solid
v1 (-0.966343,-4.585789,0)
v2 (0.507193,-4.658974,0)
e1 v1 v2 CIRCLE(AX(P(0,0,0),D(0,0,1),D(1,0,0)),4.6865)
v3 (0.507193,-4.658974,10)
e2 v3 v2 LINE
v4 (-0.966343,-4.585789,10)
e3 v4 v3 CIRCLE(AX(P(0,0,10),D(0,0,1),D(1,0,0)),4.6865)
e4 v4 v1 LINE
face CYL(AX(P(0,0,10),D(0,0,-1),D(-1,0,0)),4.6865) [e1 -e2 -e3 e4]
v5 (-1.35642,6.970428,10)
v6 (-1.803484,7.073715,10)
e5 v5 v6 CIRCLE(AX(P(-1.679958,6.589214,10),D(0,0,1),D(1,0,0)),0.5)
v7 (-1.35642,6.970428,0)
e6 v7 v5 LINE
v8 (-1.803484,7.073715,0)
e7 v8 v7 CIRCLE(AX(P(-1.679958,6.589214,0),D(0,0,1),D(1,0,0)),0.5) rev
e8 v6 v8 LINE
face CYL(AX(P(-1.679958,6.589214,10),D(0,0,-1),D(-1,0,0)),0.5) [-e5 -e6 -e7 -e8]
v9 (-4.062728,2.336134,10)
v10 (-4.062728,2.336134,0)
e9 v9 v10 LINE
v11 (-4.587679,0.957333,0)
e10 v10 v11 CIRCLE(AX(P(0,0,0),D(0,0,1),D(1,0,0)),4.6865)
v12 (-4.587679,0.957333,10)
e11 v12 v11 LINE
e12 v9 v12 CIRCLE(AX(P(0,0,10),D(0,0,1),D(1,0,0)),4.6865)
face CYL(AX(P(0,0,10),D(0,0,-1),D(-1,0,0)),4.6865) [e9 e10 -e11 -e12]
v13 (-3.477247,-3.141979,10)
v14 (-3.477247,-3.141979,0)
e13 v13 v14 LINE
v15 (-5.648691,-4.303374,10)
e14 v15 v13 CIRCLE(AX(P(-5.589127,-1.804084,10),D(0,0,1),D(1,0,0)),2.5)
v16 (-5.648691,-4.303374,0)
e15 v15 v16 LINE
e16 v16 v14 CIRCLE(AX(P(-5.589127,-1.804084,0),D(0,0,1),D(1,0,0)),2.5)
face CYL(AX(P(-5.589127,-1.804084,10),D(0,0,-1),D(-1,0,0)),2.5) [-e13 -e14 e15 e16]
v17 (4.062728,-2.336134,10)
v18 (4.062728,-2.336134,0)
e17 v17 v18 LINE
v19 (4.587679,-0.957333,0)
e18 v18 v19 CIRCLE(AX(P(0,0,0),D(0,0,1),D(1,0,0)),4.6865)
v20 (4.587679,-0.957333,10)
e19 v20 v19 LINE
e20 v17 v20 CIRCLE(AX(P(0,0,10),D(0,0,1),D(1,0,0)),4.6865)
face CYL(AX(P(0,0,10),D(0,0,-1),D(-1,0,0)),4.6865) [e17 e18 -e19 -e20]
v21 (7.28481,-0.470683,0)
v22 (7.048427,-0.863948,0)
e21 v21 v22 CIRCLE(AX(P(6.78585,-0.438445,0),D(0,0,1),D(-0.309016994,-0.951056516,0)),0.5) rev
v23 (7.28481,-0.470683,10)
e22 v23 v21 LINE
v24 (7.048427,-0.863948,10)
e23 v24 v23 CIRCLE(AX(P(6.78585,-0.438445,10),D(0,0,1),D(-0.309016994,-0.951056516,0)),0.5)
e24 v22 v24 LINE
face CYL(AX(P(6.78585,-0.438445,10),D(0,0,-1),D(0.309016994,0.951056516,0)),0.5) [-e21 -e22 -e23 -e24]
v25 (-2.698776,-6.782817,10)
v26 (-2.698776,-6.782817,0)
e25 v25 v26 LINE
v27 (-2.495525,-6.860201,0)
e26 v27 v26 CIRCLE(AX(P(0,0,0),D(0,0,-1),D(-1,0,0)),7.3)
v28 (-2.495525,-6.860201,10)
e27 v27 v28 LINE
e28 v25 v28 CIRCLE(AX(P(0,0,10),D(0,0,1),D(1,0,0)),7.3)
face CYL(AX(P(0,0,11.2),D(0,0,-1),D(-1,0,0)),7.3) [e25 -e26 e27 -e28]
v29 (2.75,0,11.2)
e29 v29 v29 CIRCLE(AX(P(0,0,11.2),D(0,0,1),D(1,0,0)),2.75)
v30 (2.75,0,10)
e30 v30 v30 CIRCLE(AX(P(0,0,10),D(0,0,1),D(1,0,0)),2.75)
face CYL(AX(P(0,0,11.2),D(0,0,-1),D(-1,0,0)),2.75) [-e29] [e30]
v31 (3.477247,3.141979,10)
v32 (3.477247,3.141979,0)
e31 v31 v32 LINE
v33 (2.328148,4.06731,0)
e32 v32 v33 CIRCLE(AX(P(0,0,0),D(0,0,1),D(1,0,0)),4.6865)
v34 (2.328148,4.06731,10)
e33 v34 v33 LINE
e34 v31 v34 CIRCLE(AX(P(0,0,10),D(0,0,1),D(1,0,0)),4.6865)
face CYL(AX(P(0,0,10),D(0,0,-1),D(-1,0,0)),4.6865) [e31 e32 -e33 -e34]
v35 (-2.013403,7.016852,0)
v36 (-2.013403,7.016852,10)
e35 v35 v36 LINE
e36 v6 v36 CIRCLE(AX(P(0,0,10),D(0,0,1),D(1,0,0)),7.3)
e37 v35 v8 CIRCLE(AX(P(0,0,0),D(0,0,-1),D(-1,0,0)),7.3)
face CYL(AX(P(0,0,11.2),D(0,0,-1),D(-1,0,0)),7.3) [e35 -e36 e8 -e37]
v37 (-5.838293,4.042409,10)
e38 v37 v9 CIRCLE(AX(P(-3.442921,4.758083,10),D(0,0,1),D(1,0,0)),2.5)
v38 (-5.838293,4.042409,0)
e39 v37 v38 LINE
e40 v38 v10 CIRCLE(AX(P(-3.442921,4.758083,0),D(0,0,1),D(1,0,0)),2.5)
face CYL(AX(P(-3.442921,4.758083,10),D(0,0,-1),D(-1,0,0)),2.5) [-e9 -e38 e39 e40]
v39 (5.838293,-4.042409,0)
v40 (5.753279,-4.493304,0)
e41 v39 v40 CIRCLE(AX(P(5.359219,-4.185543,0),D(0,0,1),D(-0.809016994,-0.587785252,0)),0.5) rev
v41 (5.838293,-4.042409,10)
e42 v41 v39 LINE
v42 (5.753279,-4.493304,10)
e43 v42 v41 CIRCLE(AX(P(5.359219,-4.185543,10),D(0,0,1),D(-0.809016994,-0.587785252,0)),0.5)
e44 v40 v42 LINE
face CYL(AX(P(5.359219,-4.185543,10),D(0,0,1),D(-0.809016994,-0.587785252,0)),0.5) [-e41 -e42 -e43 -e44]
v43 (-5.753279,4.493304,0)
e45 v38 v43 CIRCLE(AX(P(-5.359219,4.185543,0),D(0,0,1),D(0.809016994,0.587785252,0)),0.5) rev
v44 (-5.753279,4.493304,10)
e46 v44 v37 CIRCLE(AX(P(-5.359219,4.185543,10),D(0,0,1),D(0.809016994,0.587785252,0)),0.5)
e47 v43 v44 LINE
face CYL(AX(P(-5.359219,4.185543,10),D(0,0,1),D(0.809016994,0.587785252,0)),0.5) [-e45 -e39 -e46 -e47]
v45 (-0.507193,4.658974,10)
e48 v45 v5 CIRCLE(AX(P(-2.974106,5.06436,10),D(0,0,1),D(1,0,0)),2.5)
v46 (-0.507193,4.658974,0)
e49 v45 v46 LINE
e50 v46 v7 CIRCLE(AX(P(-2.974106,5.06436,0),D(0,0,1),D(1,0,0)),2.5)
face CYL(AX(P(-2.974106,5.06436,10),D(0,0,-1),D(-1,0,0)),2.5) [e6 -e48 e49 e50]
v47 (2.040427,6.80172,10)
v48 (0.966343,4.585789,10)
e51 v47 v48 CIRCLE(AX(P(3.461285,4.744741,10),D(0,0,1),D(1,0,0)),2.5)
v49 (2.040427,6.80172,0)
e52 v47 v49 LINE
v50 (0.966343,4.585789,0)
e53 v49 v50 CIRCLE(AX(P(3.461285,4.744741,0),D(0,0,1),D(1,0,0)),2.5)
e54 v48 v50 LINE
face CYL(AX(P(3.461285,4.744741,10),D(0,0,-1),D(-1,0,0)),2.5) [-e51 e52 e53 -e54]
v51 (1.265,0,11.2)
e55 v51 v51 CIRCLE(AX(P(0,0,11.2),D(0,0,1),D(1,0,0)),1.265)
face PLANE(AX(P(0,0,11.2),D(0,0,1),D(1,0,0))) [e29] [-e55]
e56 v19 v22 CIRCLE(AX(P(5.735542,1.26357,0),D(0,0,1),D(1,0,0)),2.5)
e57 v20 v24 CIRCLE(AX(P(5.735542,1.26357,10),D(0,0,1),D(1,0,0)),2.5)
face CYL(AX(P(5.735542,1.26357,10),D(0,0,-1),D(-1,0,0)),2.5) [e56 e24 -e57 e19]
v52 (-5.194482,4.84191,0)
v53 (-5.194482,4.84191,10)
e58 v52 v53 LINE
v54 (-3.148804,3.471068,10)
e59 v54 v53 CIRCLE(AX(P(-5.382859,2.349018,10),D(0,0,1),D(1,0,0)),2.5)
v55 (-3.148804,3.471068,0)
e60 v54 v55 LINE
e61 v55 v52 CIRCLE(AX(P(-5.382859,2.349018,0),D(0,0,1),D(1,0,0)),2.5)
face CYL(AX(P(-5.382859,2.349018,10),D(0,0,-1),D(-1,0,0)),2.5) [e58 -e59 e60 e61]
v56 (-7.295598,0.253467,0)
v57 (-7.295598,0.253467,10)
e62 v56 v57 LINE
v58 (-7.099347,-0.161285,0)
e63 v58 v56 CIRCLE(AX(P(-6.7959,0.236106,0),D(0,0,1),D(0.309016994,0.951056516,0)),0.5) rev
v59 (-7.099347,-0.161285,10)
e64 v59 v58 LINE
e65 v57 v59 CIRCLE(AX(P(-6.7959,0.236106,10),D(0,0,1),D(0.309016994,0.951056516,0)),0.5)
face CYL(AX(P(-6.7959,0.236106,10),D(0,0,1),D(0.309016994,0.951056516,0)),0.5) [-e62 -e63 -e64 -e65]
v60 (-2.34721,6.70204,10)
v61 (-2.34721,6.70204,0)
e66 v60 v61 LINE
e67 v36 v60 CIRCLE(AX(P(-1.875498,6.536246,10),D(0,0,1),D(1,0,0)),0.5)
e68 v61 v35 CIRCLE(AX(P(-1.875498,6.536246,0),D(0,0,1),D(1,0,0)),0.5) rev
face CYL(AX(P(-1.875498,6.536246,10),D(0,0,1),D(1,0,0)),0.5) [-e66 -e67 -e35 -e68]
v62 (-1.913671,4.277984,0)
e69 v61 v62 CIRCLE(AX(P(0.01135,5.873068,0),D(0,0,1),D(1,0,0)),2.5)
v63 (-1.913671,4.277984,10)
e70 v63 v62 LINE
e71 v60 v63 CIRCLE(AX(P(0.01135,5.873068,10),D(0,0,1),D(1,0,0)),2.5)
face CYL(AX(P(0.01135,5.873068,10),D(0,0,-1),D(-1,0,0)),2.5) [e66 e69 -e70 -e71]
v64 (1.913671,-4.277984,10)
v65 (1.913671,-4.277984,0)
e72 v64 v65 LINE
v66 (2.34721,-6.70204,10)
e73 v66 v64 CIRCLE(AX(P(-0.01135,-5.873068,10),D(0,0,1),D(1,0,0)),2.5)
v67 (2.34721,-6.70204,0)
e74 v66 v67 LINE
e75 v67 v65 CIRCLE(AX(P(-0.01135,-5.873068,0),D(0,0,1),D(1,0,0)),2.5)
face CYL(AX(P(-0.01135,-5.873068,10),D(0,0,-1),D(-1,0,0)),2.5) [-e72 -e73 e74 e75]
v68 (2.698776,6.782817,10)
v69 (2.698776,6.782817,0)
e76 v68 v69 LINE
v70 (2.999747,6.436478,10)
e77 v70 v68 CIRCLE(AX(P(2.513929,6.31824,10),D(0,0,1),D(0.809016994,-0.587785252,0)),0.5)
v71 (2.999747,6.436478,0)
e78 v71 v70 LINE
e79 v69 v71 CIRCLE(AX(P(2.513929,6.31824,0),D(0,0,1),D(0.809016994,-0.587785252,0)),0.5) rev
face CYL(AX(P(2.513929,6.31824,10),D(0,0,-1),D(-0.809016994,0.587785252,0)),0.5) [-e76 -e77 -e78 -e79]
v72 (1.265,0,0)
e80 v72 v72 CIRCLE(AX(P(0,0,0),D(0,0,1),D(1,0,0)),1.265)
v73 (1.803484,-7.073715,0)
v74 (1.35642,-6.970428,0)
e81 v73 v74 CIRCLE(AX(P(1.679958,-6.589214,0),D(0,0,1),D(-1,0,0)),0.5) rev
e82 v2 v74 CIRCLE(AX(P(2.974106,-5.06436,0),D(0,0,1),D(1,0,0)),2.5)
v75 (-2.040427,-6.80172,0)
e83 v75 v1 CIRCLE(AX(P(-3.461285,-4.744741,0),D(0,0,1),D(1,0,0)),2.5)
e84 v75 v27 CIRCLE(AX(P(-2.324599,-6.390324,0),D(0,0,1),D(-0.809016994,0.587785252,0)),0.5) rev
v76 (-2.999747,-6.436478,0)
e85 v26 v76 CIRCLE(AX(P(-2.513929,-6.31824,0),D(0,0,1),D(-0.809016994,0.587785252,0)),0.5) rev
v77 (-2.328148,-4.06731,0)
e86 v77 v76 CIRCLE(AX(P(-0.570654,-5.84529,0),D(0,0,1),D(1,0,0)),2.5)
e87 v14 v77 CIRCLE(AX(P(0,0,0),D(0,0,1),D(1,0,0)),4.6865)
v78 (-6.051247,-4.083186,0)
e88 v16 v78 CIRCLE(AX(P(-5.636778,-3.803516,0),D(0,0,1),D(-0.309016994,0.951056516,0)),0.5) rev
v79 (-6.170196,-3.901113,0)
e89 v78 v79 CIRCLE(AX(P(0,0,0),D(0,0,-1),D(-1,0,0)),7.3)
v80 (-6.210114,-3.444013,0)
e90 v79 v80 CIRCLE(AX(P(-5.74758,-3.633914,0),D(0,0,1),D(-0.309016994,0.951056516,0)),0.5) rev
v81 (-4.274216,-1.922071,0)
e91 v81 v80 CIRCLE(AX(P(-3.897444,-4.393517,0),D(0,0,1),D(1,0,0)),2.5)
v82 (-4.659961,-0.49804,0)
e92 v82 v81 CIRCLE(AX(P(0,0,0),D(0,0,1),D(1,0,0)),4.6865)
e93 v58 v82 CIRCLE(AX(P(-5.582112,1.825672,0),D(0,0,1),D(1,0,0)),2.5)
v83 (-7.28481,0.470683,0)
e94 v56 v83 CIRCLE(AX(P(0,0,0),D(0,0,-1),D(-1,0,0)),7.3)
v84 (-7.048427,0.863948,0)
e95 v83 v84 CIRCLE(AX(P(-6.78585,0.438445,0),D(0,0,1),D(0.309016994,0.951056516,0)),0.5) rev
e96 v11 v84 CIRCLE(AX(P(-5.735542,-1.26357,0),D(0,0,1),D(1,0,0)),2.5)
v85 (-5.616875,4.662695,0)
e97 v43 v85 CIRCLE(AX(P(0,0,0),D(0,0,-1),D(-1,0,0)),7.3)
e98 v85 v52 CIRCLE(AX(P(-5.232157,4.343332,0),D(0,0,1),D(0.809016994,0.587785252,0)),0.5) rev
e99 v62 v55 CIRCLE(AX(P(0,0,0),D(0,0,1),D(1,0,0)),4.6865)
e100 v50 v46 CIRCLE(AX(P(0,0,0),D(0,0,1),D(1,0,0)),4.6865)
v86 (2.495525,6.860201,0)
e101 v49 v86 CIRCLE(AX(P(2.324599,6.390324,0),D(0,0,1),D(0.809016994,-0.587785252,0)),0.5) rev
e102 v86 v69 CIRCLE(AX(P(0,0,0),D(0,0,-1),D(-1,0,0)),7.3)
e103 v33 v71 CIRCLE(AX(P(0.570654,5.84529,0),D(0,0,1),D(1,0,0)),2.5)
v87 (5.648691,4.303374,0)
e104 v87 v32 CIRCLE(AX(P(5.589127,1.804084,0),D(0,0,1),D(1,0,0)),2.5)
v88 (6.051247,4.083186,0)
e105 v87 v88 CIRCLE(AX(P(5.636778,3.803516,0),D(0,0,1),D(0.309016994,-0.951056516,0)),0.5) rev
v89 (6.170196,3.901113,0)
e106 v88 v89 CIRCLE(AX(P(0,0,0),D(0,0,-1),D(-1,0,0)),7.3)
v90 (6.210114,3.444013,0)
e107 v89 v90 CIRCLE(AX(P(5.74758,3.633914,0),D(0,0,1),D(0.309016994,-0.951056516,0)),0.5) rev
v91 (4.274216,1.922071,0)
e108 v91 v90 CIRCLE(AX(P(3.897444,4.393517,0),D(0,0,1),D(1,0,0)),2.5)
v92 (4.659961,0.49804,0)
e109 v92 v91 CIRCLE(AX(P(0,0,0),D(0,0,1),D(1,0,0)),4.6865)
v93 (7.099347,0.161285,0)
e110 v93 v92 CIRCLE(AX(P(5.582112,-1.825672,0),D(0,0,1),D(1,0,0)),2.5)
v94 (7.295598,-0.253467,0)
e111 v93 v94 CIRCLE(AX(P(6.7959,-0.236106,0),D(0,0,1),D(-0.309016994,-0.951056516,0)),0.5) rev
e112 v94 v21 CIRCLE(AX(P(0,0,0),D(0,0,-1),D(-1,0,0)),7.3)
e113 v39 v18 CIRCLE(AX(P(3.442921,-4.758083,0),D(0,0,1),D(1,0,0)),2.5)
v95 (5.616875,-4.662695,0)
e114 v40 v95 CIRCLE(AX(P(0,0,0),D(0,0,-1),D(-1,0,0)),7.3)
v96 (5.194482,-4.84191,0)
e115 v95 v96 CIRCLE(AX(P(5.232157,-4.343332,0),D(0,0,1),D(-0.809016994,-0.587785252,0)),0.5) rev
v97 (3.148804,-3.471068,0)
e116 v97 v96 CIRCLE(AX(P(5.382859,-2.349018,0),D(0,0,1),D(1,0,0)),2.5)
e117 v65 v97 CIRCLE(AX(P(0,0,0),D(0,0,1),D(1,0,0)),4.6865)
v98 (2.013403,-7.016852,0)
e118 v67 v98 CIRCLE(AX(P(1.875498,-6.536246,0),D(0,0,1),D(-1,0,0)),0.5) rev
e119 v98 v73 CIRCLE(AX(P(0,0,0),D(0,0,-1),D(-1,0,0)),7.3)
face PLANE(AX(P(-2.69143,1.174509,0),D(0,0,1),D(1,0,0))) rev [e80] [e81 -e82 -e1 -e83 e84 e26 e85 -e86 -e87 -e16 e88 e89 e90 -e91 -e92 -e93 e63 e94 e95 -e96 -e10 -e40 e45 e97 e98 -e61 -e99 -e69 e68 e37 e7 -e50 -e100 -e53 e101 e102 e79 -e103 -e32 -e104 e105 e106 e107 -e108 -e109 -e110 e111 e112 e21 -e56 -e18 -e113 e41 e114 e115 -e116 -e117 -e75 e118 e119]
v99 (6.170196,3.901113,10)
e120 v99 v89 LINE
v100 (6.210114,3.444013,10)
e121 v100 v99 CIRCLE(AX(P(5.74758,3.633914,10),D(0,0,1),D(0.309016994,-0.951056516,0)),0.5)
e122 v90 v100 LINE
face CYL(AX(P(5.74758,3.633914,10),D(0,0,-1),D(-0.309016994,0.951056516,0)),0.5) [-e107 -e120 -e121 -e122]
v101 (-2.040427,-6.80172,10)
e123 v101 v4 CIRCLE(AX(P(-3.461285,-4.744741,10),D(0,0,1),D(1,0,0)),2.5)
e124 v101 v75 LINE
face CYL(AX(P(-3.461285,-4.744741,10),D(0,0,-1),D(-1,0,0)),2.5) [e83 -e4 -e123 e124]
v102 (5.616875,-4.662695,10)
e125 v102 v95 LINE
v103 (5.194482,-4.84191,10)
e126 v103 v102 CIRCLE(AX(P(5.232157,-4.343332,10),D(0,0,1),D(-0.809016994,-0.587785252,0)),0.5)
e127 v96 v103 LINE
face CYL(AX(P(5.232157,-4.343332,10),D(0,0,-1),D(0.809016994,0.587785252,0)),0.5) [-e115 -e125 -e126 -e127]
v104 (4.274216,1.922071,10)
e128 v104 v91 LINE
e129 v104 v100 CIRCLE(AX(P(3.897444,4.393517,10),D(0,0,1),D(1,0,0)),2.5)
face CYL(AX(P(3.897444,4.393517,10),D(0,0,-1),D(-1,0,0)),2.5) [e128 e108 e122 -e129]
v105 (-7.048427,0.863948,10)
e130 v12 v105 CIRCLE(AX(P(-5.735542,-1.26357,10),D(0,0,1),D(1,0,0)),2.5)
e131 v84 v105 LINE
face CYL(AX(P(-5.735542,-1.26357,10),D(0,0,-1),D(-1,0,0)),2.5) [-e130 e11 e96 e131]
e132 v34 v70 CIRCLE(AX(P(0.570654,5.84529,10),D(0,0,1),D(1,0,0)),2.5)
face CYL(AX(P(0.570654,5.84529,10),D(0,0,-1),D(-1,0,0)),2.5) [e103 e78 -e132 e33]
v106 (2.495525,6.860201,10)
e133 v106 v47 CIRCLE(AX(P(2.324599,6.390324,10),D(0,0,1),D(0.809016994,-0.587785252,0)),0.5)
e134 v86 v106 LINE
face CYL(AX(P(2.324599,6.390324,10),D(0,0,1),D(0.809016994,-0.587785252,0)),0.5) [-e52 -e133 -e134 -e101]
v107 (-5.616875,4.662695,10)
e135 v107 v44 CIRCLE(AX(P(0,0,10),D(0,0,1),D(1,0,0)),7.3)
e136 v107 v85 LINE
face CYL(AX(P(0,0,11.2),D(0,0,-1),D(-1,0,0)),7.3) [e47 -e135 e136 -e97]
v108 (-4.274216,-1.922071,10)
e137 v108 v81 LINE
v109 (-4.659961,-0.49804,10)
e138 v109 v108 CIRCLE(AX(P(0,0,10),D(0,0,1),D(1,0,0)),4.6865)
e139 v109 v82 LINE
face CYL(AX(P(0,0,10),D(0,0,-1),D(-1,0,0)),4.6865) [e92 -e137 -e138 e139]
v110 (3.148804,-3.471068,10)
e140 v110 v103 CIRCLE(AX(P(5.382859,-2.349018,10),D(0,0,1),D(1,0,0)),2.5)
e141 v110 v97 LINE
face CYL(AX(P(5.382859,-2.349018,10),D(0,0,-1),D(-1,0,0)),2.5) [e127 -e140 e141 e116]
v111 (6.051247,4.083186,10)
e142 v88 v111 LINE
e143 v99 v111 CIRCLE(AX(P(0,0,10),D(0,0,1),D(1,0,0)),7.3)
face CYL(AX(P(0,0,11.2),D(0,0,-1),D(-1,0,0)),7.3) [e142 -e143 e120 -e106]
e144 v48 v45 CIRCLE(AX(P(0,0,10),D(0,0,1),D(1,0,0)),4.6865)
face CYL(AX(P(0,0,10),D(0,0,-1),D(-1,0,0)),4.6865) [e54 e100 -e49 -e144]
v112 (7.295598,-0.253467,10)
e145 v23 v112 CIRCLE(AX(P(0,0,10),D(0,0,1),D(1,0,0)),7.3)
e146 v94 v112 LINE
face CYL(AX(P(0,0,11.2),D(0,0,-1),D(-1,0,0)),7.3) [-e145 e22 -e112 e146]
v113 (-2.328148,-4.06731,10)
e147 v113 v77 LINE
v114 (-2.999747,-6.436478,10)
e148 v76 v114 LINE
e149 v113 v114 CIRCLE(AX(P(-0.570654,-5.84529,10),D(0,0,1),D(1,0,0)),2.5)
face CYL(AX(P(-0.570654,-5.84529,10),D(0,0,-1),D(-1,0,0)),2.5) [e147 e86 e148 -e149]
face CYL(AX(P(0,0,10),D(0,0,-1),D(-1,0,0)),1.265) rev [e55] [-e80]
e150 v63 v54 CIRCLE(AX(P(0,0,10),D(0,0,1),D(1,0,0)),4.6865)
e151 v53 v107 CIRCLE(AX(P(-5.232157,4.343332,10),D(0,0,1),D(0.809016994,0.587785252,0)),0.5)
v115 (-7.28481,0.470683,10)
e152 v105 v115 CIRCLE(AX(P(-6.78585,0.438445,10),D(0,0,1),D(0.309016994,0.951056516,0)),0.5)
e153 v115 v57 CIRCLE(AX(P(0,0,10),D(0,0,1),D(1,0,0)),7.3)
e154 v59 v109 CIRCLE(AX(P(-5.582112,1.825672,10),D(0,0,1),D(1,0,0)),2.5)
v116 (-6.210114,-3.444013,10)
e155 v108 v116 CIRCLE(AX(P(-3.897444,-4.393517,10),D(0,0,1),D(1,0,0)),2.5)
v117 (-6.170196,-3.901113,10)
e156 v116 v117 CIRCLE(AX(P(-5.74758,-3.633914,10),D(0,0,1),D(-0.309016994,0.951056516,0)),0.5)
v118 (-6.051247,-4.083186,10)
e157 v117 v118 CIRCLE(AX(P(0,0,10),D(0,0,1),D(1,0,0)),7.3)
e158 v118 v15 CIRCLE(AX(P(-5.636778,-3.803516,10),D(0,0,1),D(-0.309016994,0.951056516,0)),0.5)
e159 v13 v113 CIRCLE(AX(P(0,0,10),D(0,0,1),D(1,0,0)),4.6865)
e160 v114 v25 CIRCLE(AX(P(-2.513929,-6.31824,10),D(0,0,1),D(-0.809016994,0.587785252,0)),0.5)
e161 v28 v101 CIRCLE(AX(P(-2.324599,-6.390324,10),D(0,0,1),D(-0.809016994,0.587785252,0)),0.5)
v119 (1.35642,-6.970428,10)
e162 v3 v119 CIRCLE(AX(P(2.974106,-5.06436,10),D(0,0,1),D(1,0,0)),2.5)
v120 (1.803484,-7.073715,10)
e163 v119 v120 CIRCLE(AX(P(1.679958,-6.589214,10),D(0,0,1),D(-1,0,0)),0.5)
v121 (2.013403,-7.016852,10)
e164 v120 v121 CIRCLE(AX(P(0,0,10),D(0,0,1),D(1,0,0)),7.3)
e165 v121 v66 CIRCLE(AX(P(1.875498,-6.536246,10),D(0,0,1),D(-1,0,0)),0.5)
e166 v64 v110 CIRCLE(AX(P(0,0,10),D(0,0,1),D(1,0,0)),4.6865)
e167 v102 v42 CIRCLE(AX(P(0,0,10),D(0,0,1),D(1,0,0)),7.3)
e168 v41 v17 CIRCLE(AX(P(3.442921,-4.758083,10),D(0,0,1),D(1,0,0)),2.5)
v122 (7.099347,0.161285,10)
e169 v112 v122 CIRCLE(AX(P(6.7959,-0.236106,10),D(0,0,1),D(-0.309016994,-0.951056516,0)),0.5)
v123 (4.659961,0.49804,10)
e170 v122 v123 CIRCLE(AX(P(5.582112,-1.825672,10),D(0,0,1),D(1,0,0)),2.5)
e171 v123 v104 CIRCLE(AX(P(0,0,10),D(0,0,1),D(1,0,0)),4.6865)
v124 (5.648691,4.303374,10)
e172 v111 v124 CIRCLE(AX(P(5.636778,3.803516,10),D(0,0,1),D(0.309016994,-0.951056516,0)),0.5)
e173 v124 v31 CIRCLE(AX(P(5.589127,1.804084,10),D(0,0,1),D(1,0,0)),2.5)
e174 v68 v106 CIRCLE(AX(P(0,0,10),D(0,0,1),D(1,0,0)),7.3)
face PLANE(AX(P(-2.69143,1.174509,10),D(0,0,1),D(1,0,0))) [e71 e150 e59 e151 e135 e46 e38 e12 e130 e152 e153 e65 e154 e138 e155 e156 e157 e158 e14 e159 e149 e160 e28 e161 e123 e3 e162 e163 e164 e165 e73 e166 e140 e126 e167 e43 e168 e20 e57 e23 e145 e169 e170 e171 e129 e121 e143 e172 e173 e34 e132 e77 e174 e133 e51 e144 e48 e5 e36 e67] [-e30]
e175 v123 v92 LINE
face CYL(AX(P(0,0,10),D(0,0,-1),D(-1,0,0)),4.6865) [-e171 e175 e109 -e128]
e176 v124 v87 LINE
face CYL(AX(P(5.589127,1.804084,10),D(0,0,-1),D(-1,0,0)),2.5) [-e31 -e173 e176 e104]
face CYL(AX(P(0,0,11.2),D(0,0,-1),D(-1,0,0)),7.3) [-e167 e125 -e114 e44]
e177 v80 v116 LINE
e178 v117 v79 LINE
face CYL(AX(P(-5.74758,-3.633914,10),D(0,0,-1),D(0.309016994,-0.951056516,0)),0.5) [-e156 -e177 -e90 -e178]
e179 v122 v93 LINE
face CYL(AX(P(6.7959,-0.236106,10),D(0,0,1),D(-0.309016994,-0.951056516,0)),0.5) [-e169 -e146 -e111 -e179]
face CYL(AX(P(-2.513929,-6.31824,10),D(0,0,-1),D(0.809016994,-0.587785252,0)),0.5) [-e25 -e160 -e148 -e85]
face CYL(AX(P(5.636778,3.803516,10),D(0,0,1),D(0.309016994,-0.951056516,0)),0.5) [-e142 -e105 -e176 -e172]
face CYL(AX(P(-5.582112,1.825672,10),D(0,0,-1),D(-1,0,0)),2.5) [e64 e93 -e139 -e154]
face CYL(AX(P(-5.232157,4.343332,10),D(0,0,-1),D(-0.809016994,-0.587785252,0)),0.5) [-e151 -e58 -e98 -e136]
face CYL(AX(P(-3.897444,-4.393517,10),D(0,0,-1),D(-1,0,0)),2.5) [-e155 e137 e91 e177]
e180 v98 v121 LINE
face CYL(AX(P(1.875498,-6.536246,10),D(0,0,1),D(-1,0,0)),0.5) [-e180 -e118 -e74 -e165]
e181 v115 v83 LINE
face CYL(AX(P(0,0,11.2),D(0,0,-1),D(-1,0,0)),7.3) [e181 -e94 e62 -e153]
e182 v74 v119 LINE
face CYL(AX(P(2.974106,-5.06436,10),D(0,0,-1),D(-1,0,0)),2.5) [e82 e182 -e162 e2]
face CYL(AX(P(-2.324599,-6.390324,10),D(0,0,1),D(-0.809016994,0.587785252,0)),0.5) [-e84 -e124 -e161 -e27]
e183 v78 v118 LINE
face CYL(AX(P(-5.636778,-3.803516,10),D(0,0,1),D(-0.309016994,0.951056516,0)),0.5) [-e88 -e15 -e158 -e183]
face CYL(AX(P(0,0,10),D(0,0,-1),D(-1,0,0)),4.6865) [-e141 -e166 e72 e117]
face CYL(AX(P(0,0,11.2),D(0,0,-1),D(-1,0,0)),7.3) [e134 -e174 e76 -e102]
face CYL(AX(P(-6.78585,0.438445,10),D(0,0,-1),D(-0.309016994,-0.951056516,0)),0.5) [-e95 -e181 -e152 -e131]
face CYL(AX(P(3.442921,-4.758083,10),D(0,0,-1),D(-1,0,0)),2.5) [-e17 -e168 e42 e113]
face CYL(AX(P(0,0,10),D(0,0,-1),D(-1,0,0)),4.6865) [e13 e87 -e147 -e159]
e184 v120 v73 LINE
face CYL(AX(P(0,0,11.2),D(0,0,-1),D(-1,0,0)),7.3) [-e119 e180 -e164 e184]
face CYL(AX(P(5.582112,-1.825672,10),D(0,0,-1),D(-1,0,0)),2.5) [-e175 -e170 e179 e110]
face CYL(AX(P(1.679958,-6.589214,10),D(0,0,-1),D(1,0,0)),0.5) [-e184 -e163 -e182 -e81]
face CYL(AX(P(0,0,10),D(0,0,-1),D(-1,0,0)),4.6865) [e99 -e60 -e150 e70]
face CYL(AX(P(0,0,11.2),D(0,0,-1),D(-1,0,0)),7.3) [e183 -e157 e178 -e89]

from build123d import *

# Parameters (mm, degrees)
SKETCH_1_R               = 1.265
EXTRUDE_1_DEPTH          = 10
SKETCH_2_R               = 2.75
SKETCH_2_R_2             = 1.265
EXTRUDE_2_DEPTH          = 1.2
SKETCH_3_R               = 10.210079725
SKETCH_3_R_2             = 7.3
CUT_EXTRUDE_2_DEPTH      = 16.316956182
FILLET_1_R               = 0.5
PATTERN_CIRCULAR_2_DEPTH = 10


# Read off the part's stored shape, not the designer's step: Круговой массив2
with BuildPart() as part:
    # Эскиз1 → Бобышка-Вытянуть1 (new body)
    with BuildSketch(Plane.XY):
        with BuildLine():
            ThreePointArc((-3.148803906, 3.471068454), (-4.227852242, 4.566214035), (-5.743712894, 4.822837566))
            ThreePointArc((-5.743712894, 4.822837566), (-5.841480421, 4.703945843), (-5.936787387, 4.583072716))
            ThreePointArc((-5.936787387, 4.583072716), (-5.362797198, 3.156810321), (-4.062728379, 2.336133637))
            ThreePointArc((-4.062728379, 2.336133637), (-4.379801209, 1.667520202), (-4.587678719, 0.95733287))
            ThreePointArc((-4.587678719, 0.95733287), (-6.104357582, 1.209075557), (-7.481554138, 0.525687819))
            ThreePointArc((-7.481554138, 0.525687819), (-7.490766927, 0.372036085), (-7.496824441, 0.218227641))
            ThreePointArc((-7.496824441, 0.218227641), (-6.194120622, -0.598259906), (-4.659961201, -0.498040012))
            ThreePointArc((-4.659961201, -0.498040012), (-4.523477392, -1.225330377), (-4.274216191, -1.922071332))
            ThreePointArc((-4.274216191, -1.922071332), (-5.649205805, -2.609888688), (-6.361695989, -3.972256807))
            ThreePointArc((-6.361695989, -3.972256807), (-6.278835069, -4.101978813), (-6.193329365, -4.229972975))
            ThreePointArc((-6.193329365, -4.229972975), (-4.659500498, -4.124815183), (-3.477247231, -3.141979304))
            ThreePointArc((-3.477247231, -3.141979304), (-2.939338959, -3.650146399), (-2.328148353, -4.067309614))
            ThreePointArc((-2.328148353, -4.067309614), (-3.03624942, -5.431964161), (-2.811886199, -6.952934345))
            ThreePointArc((-2.811886199, -6.952934345), (-2.668601624, -7.009177225), (-2.524192976, -7.062467686))
            ThreePointArc((-2.524192976, -7.062467686), (-1.345109555, -6.075831258), (-0.966343005, -4.585789294))
            ThreePointArc((-0.966343005, -4.585789294), (-0.232472948, -4.68073056), (0.507193024, -4.658973866))
            ThreePointArc((0.507193024, -4.658973866), (0.736451045, -6.179213951), (1.811968547, -7.277827285))
            ThreePointArc((1.811968547, -7.277827285), (1.960946938, -7.239108171), (2.109099336, -7.197339786))
            ThreePointArc((2.109099336, -7.197339786), (2.483067519, -5.706086302), (1.913671403, -4.277983638))
            ThreePointArc((1.913671403, -4.277983638), (2.563189827, -3.92343474), (3.148803906, -3.471068454))
            ThreePointArc((3.148803906, -3.471068454), (4.227852242, -4.566214035), (5.743712894, -4.822837566))
            ThreePointArc((5.743712894, -4.822837566), (5.841480421, -4.703945843), (5.936787387, -4.583072716))
            ThreePointArc((5.936787387, -4.583072716), (5.362797198, -3.156810321), (4.062728379, -2.336133637))
            ThreePointArc((4.062728379, -2.336133637), (4.379801209, -1.667520202), (4.587678719, -0.95733287))
            ThreePointArc((4.587678719, -0.95733287), (6.104357582, -1.209075557), (7.481554138, -0.525687819))
            ThreePointArc((7.481554138, -0.525687819), (7.490766927, -0.372036085), (7.496824441, -0.218227641))
            ThreePointArc((7.496824441, -0.218227641), (6.194120622, 0.598259906), (4.659961201, 0.498040012))
            ThreePointArc((4.659961201, 0.498040012), (4.523477392, 1.225330377), (4.274216191, 1.922071332))
            ThreePointArc((4.274216191, 1.922071332), (5.649205805, 2.609888688), (6.361695989, 3.972256807))
            ThreePointArc((6.361695989, 3.972256807), (6.278835069, 4.101978813), (6.193329365, 4.229972975))
            ThreePointArc((6.193329365, 4.229972975), (4.659500498, 4.124815183), (3.477247231, 3.141979304))
            ThreePointArc((3.477247231, 3.141979304), (2.939338959, 3.650146399), (2.328148353, 4.067309614))
            ThreePointArc((2.328148353, 4.067309614), (3.03624942, 5.431964161), (2.811886199, 6.952934345))
            ThreePointArc((2.811886199, 6.952934345), (2.668601624, 7.009177225), (2.524192976, 7.062467686))
            ThreePointArc((2.524192976, 7.062467686), (1.345109555, 6.075831258), (0.966343005, 4.585789294))
            ThreePointArc((0.966343005, 4.585789294), (0.232472948, 4.68073056), (-0.507193024, 4.658973866))
            ThreePointArc((-0.507193024, 4.658973866), (-0.736451045, 6.179213951), (-1.811968547, 7.277827285))
            ThreePointArc((-1.811968547, 7.277827285), (-1.960946938, 7.239108171), (-2.109099336, 7.197339786))
            ThreePointArc((-2.109099336, 7.197339786), (-2.483067519, 5.706086302), (-1.913671403, 4.277983638))
            ThreePointArc((-1.913671403, 4.277983638), (-2.563189827, 3.92343474), (-3.148803906, 3.471068454))
        make_face()
        Circle(SKETCH_1_R, mode=Mode.SUBTRACT)
    extrude(amount=EXTRUDE_1_DEPTH)

    # Эскиз2 → Бобышка-Вытянуть2 (add)
    with BuildSketch(Plane.XY.offset(10)):
        Circle(SKETCH_2_R)
        Circle(SKETCH_2_R_2, mode=Mode.SUBTRACT)
    extrude(amount=EXTRUDE_2_DEPTH)

    # Эскиз3 → Вырез-Вытянуть2 (cut, through all)
    with BuildSketch(Plane(origin=(0, 0, 0), x_dir=(-1, 0, 0), z_dir=(0, 0, -1))):
        Circle(SKETCH_3_R)
        Circle(SKETCH_3_R_2, mode=Mode.SUBTRACT)
    extrude(amount=-CUT_EXTRUDE_2_DEPTH, mode=Mode.SUBTRACT)

    # Скругление1
    fillet_1_edges = [part.edges().sort_by_distance(p)[0] for p in [
        (-2.246892365, 6.945608303, 5),
        (-1.565958675, 7.13006125, 5),
    ]]
    fillet(fillet_1_edges, radius=FILLET_1_R)

    # Круговой массив2 outline → Круговой массив2 (cut)
    with BuildSketch(Plane.XY):
        with BuildLine():
            ThreePointArc((-5.838293306, 4.042408612), (-5.850561559, 4.278183981), (-5.753278974, 4.493304024))
            ThreePointArc((-5.753278974, 4.493304024), (-5.827604273, 4.396479095), (-5.900300237, 4.298424958))
            ThreePointArc((-5.900300237, 4.298424958), (-5.872671085, 4.169599529), (-5.838293306, 4.042408612))
        make_face()
        with BuildLine():
            ThreePointArc((-5.457832031, 4.847893307), (-5.538127486, 4.755958783), (-5.61687454, 4.662694543))
            ThreePointArc((-5.61687454, 4.662694543), (-5.427449488, 4.803615386), (-5.19448163, 4.841910441))
            ThreePointArc((-5.19448163, 4.841910441), (-5.326077976, 4.84837285), (-5.457832031, 4.847893307))
        make_face()
        with BuildLine():
            ThreePointArc((-7.099346669, -0.161285439), (-7.247857179, 0.022249743), (-7.295598302, 0.253466783))
            ThreePointArc((-7.295598302, 0.253466783), (-7.298816468, 0.131446456), (-7.299993962, 0.009389377))
            ThreePointArc((-7.299993962, 0.009389377), (-7.201919821, -0.078592576), (-7.099346669, -0.161285439))
        make_face()
        with BuildLine():
            ThreePointArc((-7.264999056, 0.713994895), (-7.275921686, 0.592421818), (-7.284810046, 0.470683106))
            ThreePointArc((-7.284810046, 0.470683106), (-7.214393154, 0.696031715), (-7.048427465, 0.863948137))
            ThreePointArc((-7.048427465, 0.863948137), (-7.158689654, 0.791825944), (-7.264999056, 0.713994895))
        make_face()
        with BuildLine():
            ThreePointArc((-5.648690902, -4.303373934), (-5.876717701, -4.24218314), (-6.051247048, -4.083186154))
            ThreePointArc((-6.051247048, -4.083186154), (-5.982128849, -4.183794263), (-5.911338111, -4.283232627))
            ThreePointArc((-5.911338111, -4.283232627), (-5.78027997, -4.296764989), (-5.648690902, -4.303373934))
        make_face()
        with BuildLine():
            ThreePointArc((-6.29718337, -3.692625299), (-6.234561102, -3.797400146), (-6.170195716, -3.90111328))
            ThreePointArc((-6.170195716, -3.90111328), (-6.245683843, -3.677412414), (-6.210113576, -3.444012991))
            ThreePointArc((-6.210113576, -3.444012991), (-6.2569252, -3.567171559), (-6.29718337, -3.692625299))
        make_face()
        with BuildLine():
            ThreePointArc((-2.040427202, -6.801719852), (-2.260871804, -6.88624625), (-2.495525095, -6.860200762))
            ThreePointArc((-2.495525095, -6.860200762), (-2.380471335, -6.900967774), (-2.264752021, -6.939805349))
            ThreePointArc((-2.264752021, -6.939805349), (-2.150769635, -6.873719217), (-2.040427202, -6.801719852))
        make_face()
        with BuildLine():
            ThreePointArc((-2.92405767, -6.688788137), (-2.811810081, -6.736744322), (-2.69877634, -6.782816986))
            ThreePointArc((-2.69877634, -6.782816986), (-2.891335587, -6.646209992), (-2.999747375, -6.436478214))
            ThreePointArc((-2.999747375, -6.436478214), (-2.965227985, -6.563630771), (-2.92405767, -6.688788137))
        make_face()
        with BuildLine():
            ThreePointArc((2.347210337, -6.702039969), (2.218550278, -6.899997348), (2.013402624, -7.016851849))
            ThreePointArc((2.013402624, -7.016851849), (2.130445319, -6.982206151), (2.246892365, -6.945608303))
            ThreePointArc((2.246892365, -6.945608303), (2.300261598, -6.825146334), (2.347210337, -6.702039969))
        make_face()
        with BuildLine():
            ThreePointArc((1.565958675, -7.13006125), (1.684956821, -7.102881142), (1.80348387, -7.073715143))
            ThreePointArc((1.80348387, -7.073715143), (1.56740459, -7.076381249), (1.356420365, -6.970427527))
            ThreePointArc((1.356420365, -6.970427527), (1.459085537, -7.053006118), (1.565958675, -7.13006125))
        make_face()
        with BuildLine():
            ThreePointArc((5.838293306, -4.042408612), (5.850561559, -4.278183981), (5.753278974, -4.493304024))
            ThreePointArc((5.753278974, -4.493304024), (5.827604273, -4.396479095), (5.900300237, -4.298424958))
            ThreePointArc((5.900300237, -4.298424958), (5.872671085, -4.169599529), (5.838293306, -4.042408612))
        make_face()
        with BuildLine():
            ThreePointArc((5.457832031, -4.847893307), (5.538127486, -4.755958783), (5.61687454, -4.662694543))
            ThreePointArc((5.61687454, -4.662694543), (5.427449488, -4.803615386), (5.19448163, -4.841910441))
            ThreePointArc((5.19448163, -4.841910441), (5.326077976, -4.84837285), (5.457832031, -4.847893307))
        make_face()
        with BuildLine():
            ThreePointArc((7.099346669, 0.161285439), (7.247857179, -0.022249743), (7.295598302, -0.253466783))
            ThreePointArc((7.295598302, -0.253466783), (7.298816468, -0.131446456), (7.299993962, -0.009389377))
            ThreePointArc((7.299993962, -0.009389377), (7.201919821, 0.078592576), (7.099346669, 0.161285439))
        make_face()
        with BuildLine():
            ThreePointArc((7.264999056, -0.713994895), (7.275921686, -0.592421818), (7.284810046, -0.470683106))
            ThreePointArc((7.284810046, -0.470683106), (7.214393154, -0.696031715), (7.048427465, -0.863948137))
            ThreePointArc((7.048427465, -0.863948137), (7.158689654, -0.791825944), (7.264999056, -0.713994895))
        make_face()
        with BuildLine():
            ThreePointArc((5.648690902, 4.303373934), (5.876717701, 4.24218314), (6.051247048, 4.083186154))
            ThreePointArc((6.051247048, 4.083186154), (5.982128849, 4.183794263), (5.911338111, 4.283232627))
            ThreePointArc((5.911338111, 4.283232627), (5.78027997, 4.296764989), (5.648690902, 4.303373934))
        make_face()
        with BuildLine():
            ThreePointArc((6.29718337, 3.692625299), (6.234561102, 3.797400146), (6.170195716, 3.90111328))
            ThreePointArc((6.170195716, 3.90111328), (6.245683843, 3.677412414), (6.210113576, 3.444012991))
            ThreePointArc((6.210113576, 3.444012991), (6.2569252, 3.567171559), (6.29718337, 3.692625299))
        make_face()
        with BuildLine():
            ThreePointArc((2.040427202, 6.801719852), (2.260871804, 6.88624625), (2.495525095, 6.860200762))
            ThreePointArc((2.495525095, 6.860200762), (2.380471335, 6.900967774), (2.264752021, 6.939805349))
            ThreePointArc((2.264752021, 6.939805349), (2.150769635, 6.873719217), (2.040427202, 6.801719852))
        make_face()
        with BuildLine():
            ThreePointArc((2.92405767, 6.688788137), (2.811810081, 6.736744322), (2.69877634, 6.782816986))
            ThreePointArc((2.69877634, 6.782816986), (2.891335587, 6.646209992), (2.999747375, 6.436478214))
            ThreePointArc((2.999747375, 6.436478214), (2.965227985, 6.563630771), (2.92405767, 6.688788137))
        make_face()
    extrude(amount=PATTERN_CIRCULAR_2_DEPTH, mode=Mode.SUBTRACT)


solid = part.part
